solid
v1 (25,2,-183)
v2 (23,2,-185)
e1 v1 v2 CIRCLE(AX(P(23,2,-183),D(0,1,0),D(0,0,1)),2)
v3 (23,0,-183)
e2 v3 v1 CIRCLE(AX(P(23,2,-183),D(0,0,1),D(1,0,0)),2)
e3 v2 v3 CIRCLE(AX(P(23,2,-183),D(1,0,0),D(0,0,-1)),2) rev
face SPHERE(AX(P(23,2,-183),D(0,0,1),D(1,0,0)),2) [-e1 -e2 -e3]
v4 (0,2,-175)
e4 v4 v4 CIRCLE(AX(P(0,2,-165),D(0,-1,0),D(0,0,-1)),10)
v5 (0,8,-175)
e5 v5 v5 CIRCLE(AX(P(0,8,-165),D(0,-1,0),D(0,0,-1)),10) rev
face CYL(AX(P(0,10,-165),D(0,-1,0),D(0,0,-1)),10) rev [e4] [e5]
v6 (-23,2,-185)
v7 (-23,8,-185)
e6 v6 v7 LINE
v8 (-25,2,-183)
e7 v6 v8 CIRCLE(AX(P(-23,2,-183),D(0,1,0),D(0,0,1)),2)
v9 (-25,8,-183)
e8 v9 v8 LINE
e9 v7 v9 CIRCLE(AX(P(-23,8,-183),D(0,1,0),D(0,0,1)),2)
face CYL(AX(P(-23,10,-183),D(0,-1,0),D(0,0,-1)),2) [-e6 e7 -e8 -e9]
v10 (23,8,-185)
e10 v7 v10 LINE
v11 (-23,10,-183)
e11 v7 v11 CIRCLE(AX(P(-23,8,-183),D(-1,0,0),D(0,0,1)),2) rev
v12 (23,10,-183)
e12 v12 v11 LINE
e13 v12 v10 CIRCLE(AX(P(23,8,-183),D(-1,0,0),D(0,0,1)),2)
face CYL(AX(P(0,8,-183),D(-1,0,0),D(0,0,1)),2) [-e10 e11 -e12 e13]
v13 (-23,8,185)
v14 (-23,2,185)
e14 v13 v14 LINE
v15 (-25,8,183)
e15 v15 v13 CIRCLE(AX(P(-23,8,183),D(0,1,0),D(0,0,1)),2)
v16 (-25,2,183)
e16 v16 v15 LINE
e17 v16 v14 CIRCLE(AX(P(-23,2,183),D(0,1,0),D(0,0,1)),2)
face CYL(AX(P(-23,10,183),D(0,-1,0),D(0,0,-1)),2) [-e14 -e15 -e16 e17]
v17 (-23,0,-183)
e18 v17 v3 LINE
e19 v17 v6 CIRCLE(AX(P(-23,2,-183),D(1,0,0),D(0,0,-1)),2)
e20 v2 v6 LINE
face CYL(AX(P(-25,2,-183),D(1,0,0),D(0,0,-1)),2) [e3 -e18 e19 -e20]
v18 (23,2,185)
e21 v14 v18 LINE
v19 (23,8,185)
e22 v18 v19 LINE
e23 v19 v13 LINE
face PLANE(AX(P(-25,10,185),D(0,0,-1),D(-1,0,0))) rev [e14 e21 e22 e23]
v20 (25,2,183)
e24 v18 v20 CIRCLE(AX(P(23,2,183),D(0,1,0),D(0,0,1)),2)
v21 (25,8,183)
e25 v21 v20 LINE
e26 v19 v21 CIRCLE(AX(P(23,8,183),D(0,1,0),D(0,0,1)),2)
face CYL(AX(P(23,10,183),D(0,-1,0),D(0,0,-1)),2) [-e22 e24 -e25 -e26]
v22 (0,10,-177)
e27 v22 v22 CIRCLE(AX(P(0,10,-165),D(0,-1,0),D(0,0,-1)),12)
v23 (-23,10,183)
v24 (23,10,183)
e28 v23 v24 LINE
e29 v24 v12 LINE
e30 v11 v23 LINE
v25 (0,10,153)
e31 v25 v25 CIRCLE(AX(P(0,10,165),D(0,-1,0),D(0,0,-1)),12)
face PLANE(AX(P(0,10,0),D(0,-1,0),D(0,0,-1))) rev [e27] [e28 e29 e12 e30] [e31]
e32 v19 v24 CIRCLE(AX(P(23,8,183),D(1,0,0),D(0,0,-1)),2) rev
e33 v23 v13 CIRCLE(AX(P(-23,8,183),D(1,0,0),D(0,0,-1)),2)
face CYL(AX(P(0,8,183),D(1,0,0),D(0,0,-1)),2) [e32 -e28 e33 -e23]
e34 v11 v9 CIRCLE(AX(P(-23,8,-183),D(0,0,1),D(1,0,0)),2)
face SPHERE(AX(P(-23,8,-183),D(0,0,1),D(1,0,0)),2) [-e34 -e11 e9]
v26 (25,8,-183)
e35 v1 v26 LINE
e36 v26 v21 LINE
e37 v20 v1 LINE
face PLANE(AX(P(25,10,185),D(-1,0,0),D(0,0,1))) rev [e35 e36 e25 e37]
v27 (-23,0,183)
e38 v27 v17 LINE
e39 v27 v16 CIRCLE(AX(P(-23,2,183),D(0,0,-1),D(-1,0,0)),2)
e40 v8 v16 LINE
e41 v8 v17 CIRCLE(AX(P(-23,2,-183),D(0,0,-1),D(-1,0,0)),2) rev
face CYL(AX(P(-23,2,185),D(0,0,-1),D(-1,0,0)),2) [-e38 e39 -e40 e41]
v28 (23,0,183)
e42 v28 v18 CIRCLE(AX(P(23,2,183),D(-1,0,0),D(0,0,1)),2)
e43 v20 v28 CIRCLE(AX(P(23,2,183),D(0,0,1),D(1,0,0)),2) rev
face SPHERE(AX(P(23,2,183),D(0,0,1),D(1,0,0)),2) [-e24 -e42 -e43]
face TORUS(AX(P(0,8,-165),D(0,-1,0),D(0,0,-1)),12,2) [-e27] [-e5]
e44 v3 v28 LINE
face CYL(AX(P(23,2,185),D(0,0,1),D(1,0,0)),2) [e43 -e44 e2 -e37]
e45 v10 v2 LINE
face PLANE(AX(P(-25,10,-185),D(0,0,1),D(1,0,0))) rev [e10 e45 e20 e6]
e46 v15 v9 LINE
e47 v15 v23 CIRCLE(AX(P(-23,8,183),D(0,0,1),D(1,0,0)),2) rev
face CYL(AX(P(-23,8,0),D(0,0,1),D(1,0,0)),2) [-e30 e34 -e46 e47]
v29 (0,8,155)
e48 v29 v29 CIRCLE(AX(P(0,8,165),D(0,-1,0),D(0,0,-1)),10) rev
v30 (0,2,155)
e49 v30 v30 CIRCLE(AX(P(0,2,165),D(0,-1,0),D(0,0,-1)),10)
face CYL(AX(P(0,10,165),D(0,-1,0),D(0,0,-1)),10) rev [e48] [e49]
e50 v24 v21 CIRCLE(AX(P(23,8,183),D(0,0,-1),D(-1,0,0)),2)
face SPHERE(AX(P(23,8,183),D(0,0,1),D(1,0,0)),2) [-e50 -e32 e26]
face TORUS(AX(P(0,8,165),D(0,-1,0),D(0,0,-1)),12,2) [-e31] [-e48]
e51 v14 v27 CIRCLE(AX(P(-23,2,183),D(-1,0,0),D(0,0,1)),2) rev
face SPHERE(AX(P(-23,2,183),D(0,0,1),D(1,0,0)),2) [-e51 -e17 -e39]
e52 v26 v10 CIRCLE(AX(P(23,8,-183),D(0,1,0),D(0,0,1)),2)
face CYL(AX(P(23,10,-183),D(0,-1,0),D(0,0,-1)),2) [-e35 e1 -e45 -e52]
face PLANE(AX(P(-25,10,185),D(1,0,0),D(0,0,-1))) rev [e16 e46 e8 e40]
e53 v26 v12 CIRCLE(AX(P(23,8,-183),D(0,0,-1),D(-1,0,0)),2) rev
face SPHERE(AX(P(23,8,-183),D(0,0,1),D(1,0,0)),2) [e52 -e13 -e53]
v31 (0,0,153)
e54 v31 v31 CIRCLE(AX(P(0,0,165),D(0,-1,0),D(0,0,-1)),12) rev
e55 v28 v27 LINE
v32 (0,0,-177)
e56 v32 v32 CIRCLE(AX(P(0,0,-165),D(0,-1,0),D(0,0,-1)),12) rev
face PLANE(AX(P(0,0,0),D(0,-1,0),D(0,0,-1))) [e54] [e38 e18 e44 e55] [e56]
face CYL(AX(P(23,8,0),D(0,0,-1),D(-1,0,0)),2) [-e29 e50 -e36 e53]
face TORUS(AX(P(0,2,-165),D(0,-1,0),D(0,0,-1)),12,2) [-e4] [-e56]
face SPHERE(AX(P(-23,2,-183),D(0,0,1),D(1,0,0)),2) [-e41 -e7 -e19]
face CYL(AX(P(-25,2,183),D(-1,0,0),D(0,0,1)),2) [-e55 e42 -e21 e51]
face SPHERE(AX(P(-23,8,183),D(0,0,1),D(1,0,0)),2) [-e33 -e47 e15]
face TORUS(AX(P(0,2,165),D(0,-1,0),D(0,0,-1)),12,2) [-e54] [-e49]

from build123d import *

# Parameters (mm, degrees)
CROQUIS1_W              = 50
CROQUIS1_H              = 370
CROQUIS1_R              = 10
SALIENTE_EXTRUIR1_DEPTH = 10
REDONDEO1_R             = 2
REDONDEO2_R             = 2


with BuildPart() as part:
    # Croquis1 → Saliente-Extruir1 (new body)
    with BuildSketch(Plane(origin=(0, 0, 0), x_dir=(1, 0, 0), z_dir=(0, 1, 0))):
        Rectangle(CROQUIS1_W, CROQUIS1_H)
        with Locations(Location((0, 165, 0), (0, 0, 270))):
            Circle(CROQUIS1_R, mode=Mode.SUBTRACT)
        with Locations(Location((0, -165, 0), (0, 0, 90))):
            Circle(CROQUIS1_R, mode=Mode.SUBTRACT)
    extrude(amount=SALIENTE_EXTRUIR1_DEPTH)

    # Redondeo1
    redondeo1_edges = [part.edges().sort_by_distance(p)[0] for p in [
        (0, 0, -175),
        (0, 10, -175),
        (-25, 10, 0),
        (0, 0, 175),
        (0, 10, 175),
        (0, 10, 185),
        (25, 10, 0),
        (0, 0, 185),
        (-25, 0, 0),
        (0, 0, -185),
        (25, 0, 0),
        (0, 10, -185),
    ]]
    fillet(redondeo1_edges, radius=REDONDEO1_R)

    # Redondeo2
    # the kernel refuses this fillet: 2 mm, written as the material it takes off along each edge
    with BuildSketch(Plane(origin=(-23, 8, -183), x_dir=(0, 0, -1), z_dir=(-1, 0, 0))) as redondeo2_piece_1_section:
        Polygon((0, 0), (REDONDEO2_R, 0), (REDONDEO2_R, -REDONDEO2_R), (0, -REDONDEO2_R), align=None)
    redondeo2_piece_1 = extrude(amount=REDONDEO2_R, mode=Mode.PRIVATE)
    redondeo2_piece_1 = redondeo2_piece_1 - Plane(origin=(-23, 8, -183), x_dir=(0, -0.7071067811865475, 0.7071067811865475), z_dir=(-1, 0, 0)) * Sphere(REDONDEO2_R, mode=Mode.PRIVATE)
    add(redondeo2_piece_1, mode=Mode.SUBTRACT)
    with BuildSketch(Plane(origin=(23, 8, -183), x_dir=(0, 0, -1), z_dir=(1, 0, 0))) as redondeo2_piece_2_section:
        Polygon((0, 0), (REDONDEO2_R, 0), (REDONDEO2_R, REDONDEO2_R), (0, REDONDEO2_R), align=None)
    redondeo2_piece_2 = extrude(amount=REDONDEO2_R, mode=Mode.PRIVATE)
    redondeo2_piece_2 = redondeo2_piece_2 - Plane(origin=(23, 8, -183), x_dir=(0, -0.7071067811865475, 0.7071067811865475), z_dir=(1, 0, 0)) * Sphere(REDONDEO2_R, mode=Mode.PRIVATE)
    add(redondeo2_piece_2, mode=Mode.SUBTRACT)
    with BuildSketch(Plane(origin=(-23, 8, 183), x_dir=(-1, 0, 0), z_dir=(0, 0, 1))) as redondeo2_piece_3_section:
        Polygon((0, 0), (REDONDEO2_R, 0), (REDONDEO2_R, -REDONDEO2_R), (0, -REDONDEO2_R), align=None)
    redondeo2_piece_3 = extrude(amount=REDONDEO2_R, mode=Mode.PRIVATE)
    redondeo2_piece_3 = redondeo2_piece_3 - Plane(origin=(-23, 8, 183), x_dir=(0.7071067811865475, -0.7071067811865475, 0), z_dir=(0, 0, 1)) * Sphere(REDONDEO2_R, mode=Mode.PRIVATE)
    add(redondeo2_piece_3, mode=Mode.SUBTRACT)
    with BuildSketch(Plane(origin=(23, 8, 183), x_dir=(1, 0, 0), z_dir=(0, 0, 1))) as redondeo2_piece_4_section:
        Polygon((0, 0), (REDONDEO2_R, 0), (REDONDEO2_R, REDONDEO2_R), (0, REDONDEO2_R), align=None)
    redondeo2_piece_4 = extrude(amount=REDONDEO2_R, mode=Mode.PRIVATE)
    redondeo2_piece_4 = redondeo2_piece_4 - Plane(origin=(23, 8, 183), x_dir=(-0.7071067811865475, -0.7071067811865475, 0), z_dir=(0, 0, 1)) * Sphere(REDONDEO2_R, mode=Mode.PRIVATE)
    add(redondeo2_piece_4, mode=Mode.SUBTRACT)
    with BuildSketch(Plane(origin=(23, 2, 183), x_dir=(1, 0, 0), z_dir=(0, 0, 1))) as redondeo2_piece_5_section:
        Polygon((0, 0), (REDONDEO2_R, 0), (REDONDEO2_R, -REDONDEO2_R), (0, -REDONDEO2_R), align=None)
    redondeo2_piece_5 = extrude(amount=REDONDEO2_R, mode=Mode.PRIVATE)
    redondeo2_piece_5 = redondeo2_piece_5 - Plane(origin=(23, 2, 183), x_dir=(-0.7071067811865475, 0.7071067811865475, 0), z_dir=(0, 0, 1)) * Sphere(REDONDEO2_R, mode=Mode.PRIVATE)
    add(redondeo2_piece_5, mode=Mode.SUBTRACT)
    with BuildSketch(Plane(origin=(-23, 2, 183), x_dir=(-1, 0, 0), z_dir=(0, 0, 1))) as redondeo2_piece_6_section:
        Polygon((0, 0), (REDONDEO2_R, 0), (REDONDEO2_R, REDONDEO2_R), (0, REDONDEO2_R), align=None)
    redondeo2_piece_6 = extrude(amount=REDONDEO2_R, mode=Mode.PRIVATE)
    redondeo2_piece_6 = redondeo2_piece_6 - Plane(origin=(-23, 2, 183), x_dir=(0.7071067811865475, 0.7071067811865475, 0), z_dir=(0, 0, 1)) * Sphere(REDONDEO2_R, mode=Mode.PRIVATE)
    add(redondeo2_piece_6, mode=Mode.SUBTRACT)
    with BuildSketch(Plane(origin=(23, 2, -183), x_dir=(0, 0, -1), z_dir=(1, 0, 0))) as redondeo2_piece_7_section:
        Polygon((0, 0), (REDONDEO2_R, 0), (REDONDEO2_R, -REDONDEO2_R), (0, -REDONDEO2_R), align=None)
    redondeo2_piece_7 = extrude(amount=REDONDEO2_R, mode=Mode.PRIVATE)
    redondeo2_piece_7 = redondeo2_piece_7 - Plane(origin=(23, 2, -183), x_dir=(0, 0.7071067811865475, 0.7071067811865475), z_dir=(1, 0, 0)) * Sphere(REDONDEO2_R, mode=Mode.PRIVATE)
    add(redondeo2_piece_7, mode=Mode.SUBTRACT)
    with BuildSketch(Plane(origin=(-23, 2, -183), x_dir=(0, 0, -1), z_dir=(-1, 0, 0))) as redondeo2_piece_8_section:
        Polygon((0, 0), (REDONDEO2_R, 0), (REDONDEO2_R, REDONDEO2_R), (0, REDONDEO2_R), align=None)
    redondeo2_piece_8 = extrude(amount=REDONDEO2_R, mode=Mode.PRIVATE)
    redondeo2_piece_8 = redondeo2_piece_8 - Plane(origin=(-23, 2, -183), x_dir=(0, 0.7071067811865475, 0.7071067811865475), z_dir=(-1, 0, 0)) * Sphere(REDONDEO2_R, mode=Mode.PRIVATE)
    add(redondeo2_piece_8, mode=Mode.SUBTRACT)
    with BuildSketch(Plane(origin=(25, 2, 185), x_dir=(-1, 0, 0), z_dir=(0, 1, 0)), Plane(origin=(25, 2, -185), x_dir=(0, 0, 1), z_dir=(0, 1, 0))) as redondeo2_piece_9:
        with BuildLine():
            CenterArc((REDONDEO2_R, -REDONDEO2_R), REDONDEO2_R, 90, 90)
            Line((0, -REDONDEO2_R), (0, 0))
            Line((0, 0), (REDONDEO2_R, 0))
        make_face()
    extrude(amount=6, mode=Mode.SUBTRACT)
    with BuildSketch(Plane(origin=(-25, 2, 185), x_dir=(1, 0, 0), z_dir=(0, 1, 0)), Plane(origin=(-25, 2, -185), x_dir=(0, 0, 1), z_dir=(0, 1, 0))) as redondeo2_piece_10:
        with BuildLine():
            CenterArc((REDONDEO2_R, REDONDEO2_R), REDONDEO2_R, 180, 90)
            Line((0, REDONDEO2_R), (0, 0))
            Line((0, 0), (REDONDEO2_R, 0))
        make_face()
    extrude(amount=6, mode=Mode.SUBTRACT)


solid = part.part
